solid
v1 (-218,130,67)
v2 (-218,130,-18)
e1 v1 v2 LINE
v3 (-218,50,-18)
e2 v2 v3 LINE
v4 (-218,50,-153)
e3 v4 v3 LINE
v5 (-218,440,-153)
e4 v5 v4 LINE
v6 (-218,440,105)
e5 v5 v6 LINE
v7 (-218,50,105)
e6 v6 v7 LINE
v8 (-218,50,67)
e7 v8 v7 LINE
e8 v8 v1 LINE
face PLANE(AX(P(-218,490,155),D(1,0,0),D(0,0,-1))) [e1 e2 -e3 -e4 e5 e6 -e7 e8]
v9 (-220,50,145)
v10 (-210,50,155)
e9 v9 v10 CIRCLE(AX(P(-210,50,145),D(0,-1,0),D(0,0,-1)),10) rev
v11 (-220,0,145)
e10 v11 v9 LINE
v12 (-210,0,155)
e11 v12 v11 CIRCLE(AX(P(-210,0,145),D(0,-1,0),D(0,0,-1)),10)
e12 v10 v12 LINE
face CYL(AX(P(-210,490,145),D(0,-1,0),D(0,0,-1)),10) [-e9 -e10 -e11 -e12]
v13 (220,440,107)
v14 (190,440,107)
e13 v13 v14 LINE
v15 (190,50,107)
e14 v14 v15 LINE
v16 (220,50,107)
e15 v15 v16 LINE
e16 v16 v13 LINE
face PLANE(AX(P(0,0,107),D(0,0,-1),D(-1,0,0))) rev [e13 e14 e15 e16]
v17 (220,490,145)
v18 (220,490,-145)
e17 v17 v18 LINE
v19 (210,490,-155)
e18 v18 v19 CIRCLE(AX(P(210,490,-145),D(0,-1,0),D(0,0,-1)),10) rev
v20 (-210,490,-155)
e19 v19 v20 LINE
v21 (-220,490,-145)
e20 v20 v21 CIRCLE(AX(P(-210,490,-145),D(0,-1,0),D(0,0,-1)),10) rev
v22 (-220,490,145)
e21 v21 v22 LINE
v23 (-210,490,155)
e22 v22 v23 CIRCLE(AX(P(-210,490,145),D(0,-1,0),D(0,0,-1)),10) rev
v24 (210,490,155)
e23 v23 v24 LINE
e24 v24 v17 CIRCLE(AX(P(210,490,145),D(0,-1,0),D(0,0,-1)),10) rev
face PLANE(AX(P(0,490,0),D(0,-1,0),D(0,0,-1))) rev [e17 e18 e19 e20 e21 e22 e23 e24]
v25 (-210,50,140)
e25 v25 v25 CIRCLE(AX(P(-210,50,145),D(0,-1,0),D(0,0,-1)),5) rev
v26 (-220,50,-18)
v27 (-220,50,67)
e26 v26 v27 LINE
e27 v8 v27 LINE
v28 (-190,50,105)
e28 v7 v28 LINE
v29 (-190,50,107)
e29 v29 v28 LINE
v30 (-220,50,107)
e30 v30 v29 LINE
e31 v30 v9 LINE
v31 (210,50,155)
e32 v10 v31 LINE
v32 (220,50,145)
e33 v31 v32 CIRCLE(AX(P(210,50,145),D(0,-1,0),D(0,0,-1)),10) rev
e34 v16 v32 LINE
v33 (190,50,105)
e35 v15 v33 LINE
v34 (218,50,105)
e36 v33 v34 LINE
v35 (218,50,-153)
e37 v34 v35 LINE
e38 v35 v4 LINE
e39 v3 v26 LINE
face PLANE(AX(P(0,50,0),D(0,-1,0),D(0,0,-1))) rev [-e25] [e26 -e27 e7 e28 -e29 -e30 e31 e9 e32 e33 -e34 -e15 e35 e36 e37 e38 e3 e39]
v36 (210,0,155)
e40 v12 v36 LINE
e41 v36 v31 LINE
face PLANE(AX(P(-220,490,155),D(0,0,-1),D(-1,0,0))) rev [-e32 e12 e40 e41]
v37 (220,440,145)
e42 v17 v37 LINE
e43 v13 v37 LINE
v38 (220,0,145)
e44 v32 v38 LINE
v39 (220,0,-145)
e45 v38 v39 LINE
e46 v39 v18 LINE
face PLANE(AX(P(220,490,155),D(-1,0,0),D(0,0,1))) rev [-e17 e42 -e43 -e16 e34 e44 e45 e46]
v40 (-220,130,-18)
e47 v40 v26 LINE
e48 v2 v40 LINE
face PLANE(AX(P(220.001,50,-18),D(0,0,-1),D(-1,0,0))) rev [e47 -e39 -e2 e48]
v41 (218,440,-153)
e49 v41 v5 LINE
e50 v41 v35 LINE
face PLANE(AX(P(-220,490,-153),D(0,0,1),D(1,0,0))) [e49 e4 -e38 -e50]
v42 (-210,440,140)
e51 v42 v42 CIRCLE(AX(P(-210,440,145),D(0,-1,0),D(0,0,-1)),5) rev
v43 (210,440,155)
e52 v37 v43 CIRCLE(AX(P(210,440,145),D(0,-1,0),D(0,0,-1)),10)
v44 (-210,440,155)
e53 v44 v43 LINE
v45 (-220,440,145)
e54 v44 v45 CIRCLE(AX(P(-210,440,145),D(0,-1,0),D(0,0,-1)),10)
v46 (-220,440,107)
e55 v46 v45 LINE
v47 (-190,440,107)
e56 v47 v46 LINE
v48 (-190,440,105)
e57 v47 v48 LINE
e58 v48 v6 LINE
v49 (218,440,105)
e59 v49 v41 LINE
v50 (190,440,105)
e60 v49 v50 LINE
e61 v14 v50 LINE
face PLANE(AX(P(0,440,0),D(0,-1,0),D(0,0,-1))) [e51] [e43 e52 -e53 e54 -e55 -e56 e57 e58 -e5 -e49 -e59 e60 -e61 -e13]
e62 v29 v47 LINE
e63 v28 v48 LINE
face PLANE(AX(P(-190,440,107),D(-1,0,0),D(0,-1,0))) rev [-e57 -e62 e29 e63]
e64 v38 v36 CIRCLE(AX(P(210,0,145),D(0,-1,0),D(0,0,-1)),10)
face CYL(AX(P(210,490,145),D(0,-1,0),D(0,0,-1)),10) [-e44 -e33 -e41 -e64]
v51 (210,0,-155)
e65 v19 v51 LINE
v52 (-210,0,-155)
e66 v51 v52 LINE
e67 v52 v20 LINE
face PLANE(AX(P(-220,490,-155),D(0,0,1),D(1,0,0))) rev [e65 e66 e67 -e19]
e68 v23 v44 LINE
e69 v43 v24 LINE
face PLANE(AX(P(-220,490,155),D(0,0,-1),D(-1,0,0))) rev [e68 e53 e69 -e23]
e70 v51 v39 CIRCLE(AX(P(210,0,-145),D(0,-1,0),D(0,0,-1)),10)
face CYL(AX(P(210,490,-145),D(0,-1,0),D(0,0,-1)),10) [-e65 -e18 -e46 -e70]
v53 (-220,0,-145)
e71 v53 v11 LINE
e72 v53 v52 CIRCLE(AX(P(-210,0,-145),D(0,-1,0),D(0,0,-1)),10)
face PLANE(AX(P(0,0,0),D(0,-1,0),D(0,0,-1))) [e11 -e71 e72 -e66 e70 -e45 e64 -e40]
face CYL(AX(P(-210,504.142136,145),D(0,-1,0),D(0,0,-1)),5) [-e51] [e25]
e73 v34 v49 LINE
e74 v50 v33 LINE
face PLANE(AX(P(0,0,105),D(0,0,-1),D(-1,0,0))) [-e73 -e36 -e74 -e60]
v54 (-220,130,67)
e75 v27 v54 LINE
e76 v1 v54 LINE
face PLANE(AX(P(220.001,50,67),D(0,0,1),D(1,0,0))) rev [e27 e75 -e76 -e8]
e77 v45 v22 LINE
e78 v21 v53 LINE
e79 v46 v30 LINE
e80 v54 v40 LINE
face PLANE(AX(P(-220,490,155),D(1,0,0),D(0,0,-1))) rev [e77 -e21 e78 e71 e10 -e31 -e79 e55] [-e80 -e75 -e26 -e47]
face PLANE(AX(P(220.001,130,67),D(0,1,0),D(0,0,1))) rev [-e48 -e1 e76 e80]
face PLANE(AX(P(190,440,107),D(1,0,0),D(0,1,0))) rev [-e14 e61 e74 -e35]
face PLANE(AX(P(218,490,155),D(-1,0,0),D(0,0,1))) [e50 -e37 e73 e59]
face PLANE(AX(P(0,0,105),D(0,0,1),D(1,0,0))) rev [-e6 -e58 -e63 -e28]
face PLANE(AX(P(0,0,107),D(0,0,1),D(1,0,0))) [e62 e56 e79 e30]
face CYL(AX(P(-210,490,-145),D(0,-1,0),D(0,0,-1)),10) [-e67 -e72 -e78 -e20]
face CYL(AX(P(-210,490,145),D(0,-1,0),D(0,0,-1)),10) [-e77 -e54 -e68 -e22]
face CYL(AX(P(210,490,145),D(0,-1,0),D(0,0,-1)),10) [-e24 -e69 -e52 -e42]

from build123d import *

# Parameters (mm, degrees)
SKETCH1_W           = 440
SKETCH1_H           = 310
BOSS_EXTRUDE1_DEPTH = 490
SHELL1_START        = -218
SHELL1_OUTLINE_W    = 390
SHELL1_OUTLINE_H    = 308
SHELL1_DEPTH        = 436
SKETCH3_W           = 440
SKETCH3_H           = 390
CUT_EXTRUDE1_DEPTH  = 50
SKETCH4_W           = 30
SKETCH4_H           = 390
BOSS_EXTRUDE2_DEPTH = 2
SKETCH5_W           = 30
SKETCH5_H           = 390
BOSS_EXTRUDE3_DEPTH = 2
SKETCH7_R           = 5
BOSS_EXTRUDE4_DEPTH = 440
FILLET1_R           = 10
FILLET2_R           = 10
CUT_EXTRUDE2_REACH  = 678.554
SKETCH8_W           = 85
SKETCH8_H           = 80


# Read off the part's stored shape, not the designer's step: Shell1
with BuildPart() as part:
    # Sketch1 → Boss-Extrude1 (new body)
    with BuildSketch(Plane(origin=(0, 0, 0), x_dir=(1, 0, 0), z_dir=(0, 1, 0))):
        Rectangle(SKETCH1_W, SKETCH1_H)
    extrude(amount=BOSS_EXTRUDE1_DEPTH)

    # Shell1 outline → Shell1 (cut)
    with BuildSketch(Plane.YZ.offset(SHELL1_START)):
        with Locations((245, 1)):
            Rectangle(SHELL1_OUTLINE_W, SHELL1_OUTLINE_H)
    extrude(amount=SHELL1_DEPTH, mode=Mode.SUBTRACT)

    # Sketch3 → Cut-Extrude1 (cut)
    with BuildSketch(Plane.XY.offset(155)):
        with Locations((0, 245)):
            Rectangle(SKETCH3_W, SKETCH3_H)
    extrude(amount=-CUT_EXTRUDE1_DEPTH, mode=Mode.SUBTRACT)

    # Sketch4 → Boss-Extrude2 (add)
    with BuildSketch(Plane.XY.offset(105)):
        with Locations((-205, 245)):
            Rectangle(SKETCH4_W, SKETCH4_H)
    extrude(amount=BOSS_EXTRUDE2_DEPTH)

    # Sketch5 → Boss-Extrude3 (add)
    with BuildSketch(Plane.XY.offset(105)):
        with Locations((205, 245)):
            Rectangle(SKETCH5_W, SKETCH5_H)
    extrude(amount=BOSS_EXTRUDE3_DEPTH)

    # Sketch7 → Boss-Extrude4 (add)
    with BuildSketch(Plane(origin=(0, 50, 0), x_dir=(1, 0, 0), z_dir=(0, 1, 0))):
        with Locations(Location((-210, -145, 0), (0, 0, 90))):
            Circle(SKETCH7_R)
    extrude(amount=BOSS_EXTRUDE4_DEPTH)

    # Fillet1
    fillet1_edges = [part.edges().sort_by_distance(p)[0] for p in [
        (-220, 25, 155),
        (220, 25, 155),
        (220, 465, 155),
        (-220, 465, 155),
    ]]
    fillet(fillet1_edges, radius=FILLET1_R)

    # Fillet2
    fillet2_edges = [part.edges().sort_by_distance(p)[0] for p in [
        (-220, 245, -155),
        (220, 245, -155),
    ]]
    fillet(fillet2_edges, radius=FILLET2_R)

    # Sketch8 → Cut-Extrude2 (cut, up to next)
    with BuildSketch(Plane.ZY.offset(220), mode=Mode.PRIVATE) as cut_extrude2_sk1:
        with Locations((24.5, 90)):
            Rectangle(SKETCH8_W, SKETCH8_H)
    cut_extrude2_tool1 = extrude(cut_extrude2_sk1.sketch, amount=-CUT_EXTRUDE2_REACH, mode=Mode.PRIVATE) & part.part
    add(cut_extrude2_tool1.solids().sort_by_distance((-220, 90, 24.5))[0], mode=Mode.SUBTRACT)


solid = part.part
